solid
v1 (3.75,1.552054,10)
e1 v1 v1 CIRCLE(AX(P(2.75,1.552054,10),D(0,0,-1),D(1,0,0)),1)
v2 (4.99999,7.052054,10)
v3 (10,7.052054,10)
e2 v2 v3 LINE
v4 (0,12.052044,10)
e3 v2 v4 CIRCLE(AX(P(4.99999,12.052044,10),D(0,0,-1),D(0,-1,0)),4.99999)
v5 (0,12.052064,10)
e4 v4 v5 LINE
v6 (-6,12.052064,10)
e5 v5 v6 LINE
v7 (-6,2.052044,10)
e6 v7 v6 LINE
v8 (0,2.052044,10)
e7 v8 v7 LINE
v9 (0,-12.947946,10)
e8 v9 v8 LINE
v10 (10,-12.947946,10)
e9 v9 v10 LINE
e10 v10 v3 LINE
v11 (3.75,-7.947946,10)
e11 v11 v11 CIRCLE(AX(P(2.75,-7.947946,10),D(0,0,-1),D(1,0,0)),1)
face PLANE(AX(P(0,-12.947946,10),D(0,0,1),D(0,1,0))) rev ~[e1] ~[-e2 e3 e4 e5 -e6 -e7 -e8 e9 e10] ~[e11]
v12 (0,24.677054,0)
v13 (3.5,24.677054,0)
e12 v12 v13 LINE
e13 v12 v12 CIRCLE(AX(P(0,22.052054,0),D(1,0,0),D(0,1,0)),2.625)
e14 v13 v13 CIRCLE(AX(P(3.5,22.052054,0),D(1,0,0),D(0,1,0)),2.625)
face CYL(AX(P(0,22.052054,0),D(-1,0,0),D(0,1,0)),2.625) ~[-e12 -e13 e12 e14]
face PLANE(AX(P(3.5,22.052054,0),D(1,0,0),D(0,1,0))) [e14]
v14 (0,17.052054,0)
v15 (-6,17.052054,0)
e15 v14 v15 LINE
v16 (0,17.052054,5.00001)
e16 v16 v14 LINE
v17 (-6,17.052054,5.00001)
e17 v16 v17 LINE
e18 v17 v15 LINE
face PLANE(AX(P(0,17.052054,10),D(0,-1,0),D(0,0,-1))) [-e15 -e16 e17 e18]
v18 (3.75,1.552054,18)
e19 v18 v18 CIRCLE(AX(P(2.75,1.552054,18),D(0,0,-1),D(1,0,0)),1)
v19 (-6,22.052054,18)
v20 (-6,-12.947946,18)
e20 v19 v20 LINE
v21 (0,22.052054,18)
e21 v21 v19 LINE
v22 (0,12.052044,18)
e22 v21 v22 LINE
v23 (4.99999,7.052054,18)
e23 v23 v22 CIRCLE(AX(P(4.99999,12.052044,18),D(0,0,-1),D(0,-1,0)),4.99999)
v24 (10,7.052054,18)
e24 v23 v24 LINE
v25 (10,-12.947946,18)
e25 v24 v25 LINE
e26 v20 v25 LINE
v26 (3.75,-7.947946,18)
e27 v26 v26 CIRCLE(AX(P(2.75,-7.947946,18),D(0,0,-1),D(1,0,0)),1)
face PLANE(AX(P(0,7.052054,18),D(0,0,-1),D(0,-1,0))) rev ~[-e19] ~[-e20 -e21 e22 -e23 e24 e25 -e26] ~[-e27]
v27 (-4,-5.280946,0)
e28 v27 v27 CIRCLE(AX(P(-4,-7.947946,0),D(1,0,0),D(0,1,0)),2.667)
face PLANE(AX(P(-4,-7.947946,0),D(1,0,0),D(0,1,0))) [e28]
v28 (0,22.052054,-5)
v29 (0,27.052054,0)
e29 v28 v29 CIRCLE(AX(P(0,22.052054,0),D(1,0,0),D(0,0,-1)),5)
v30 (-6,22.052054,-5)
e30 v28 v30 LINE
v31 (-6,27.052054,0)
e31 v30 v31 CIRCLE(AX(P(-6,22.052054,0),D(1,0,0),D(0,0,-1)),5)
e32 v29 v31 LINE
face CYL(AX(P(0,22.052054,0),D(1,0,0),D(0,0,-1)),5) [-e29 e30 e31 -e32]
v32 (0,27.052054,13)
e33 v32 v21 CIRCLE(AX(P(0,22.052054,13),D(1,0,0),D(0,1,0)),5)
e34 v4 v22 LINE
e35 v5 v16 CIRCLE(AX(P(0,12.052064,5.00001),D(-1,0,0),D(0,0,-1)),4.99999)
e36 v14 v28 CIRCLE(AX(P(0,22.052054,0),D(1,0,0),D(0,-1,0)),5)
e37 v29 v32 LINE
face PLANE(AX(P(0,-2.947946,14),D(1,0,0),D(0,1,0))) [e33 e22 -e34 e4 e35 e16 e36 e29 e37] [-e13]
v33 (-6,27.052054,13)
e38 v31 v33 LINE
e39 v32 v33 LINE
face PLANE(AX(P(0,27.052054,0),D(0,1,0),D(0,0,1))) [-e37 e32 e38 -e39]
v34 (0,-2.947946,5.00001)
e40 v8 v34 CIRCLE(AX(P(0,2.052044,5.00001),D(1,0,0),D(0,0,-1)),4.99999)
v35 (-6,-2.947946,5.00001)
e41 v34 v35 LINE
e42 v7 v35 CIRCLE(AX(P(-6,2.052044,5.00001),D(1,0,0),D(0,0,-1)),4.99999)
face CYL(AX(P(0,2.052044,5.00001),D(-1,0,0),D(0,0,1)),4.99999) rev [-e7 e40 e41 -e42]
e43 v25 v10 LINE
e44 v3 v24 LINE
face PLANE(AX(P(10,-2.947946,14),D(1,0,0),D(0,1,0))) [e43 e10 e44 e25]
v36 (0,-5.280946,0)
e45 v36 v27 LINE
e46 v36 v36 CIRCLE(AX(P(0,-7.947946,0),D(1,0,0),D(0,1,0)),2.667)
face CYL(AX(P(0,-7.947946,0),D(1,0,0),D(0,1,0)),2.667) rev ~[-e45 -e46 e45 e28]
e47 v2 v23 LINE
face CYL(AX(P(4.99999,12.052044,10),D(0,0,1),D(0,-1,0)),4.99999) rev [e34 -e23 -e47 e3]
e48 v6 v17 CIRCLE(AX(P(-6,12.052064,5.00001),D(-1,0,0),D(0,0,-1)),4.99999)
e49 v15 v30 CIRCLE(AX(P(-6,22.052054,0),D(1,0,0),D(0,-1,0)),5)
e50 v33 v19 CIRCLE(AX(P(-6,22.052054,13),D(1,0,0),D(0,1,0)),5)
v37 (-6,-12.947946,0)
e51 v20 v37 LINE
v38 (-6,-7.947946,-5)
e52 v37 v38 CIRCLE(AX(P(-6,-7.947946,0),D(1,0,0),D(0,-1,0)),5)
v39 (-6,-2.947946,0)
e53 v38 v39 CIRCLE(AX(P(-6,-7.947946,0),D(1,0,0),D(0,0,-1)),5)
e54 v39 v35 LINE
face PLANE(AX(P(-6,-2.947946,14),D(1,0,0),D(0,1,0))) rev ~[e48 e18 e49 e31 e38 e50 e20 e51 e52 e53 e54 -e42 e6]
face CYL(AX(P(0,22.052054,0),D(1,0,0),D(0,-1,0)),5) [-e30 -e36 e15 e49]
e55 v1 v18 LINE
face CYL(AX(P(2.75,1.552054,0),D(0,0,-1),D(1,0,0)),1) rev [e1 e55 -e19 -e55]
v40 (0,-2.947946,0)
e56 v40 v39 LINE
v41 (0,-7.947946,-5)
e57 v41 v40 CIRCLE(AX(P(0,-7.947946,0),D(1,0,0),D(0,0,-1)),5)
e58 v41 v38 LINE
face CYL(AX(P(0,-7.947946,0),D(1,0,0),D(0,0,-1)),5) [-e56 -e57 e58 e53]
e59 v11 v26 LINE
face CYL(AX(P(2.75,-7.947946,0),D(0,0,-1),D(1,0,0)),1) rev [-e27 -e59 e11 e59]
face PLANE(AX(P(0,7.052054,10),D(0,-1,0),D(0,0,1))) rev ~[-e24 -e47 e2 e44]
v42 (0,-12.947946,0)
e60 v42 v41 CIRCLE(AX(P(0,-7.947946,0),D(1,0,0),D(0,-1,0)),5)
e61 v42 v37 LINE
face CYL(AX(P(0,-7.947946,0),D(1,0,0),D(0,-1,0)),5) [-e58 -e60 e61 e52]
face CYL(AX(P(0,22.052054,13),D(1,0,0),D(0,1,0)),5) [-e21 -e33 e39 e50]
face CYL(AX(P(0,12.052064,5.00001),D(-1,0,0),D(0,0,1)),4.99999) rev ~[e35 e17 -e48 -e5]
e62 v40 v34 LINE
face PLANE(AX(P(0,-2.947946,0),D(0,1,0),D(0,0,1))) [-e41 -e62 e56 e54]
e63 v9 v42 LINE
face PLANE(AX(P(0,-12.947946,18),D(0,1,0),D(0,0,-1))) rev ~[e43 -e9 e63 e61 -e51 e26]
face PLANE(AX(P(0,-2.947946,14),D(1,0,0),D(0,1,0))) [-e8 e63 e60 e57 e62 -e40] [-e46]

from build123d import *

# Parameters (mm, degrees)
F0_R     = 2.667
F0_R_2   = 2.625
F2_DEPTH = 6
F3_DEPTH = 3.5
F4_DEPTH = 4
F5_DEPTH = 10
F1_R     = 1
F6_DEPTH = 18.001
F7_R     = 4.99999


# Not quite as in the source:
# - a fillet or chamfer is up to 0.001 mm smaller than in the source, because OpenCascade refuses the exact size


with BuildPart() as f2:
    # F0 (on Right) → F2 (new body)
    with BuildSketch(Plane.YZ):
        Polygon((7.0520542562, 18), (-12.9479457438, 18), (-12.9479457438, 10), (-2.9479457438, 10), (7.0520542562, 10), align=None)
        with BuildLine():
            Line((22.0520542562, 18), (7.0520542562, 18))
            Line((7.0520542562, 18), (7.0520542562, 10))
            Line((7.0520542562, 10), (17.0520542562, 10))
            Line((17.0520542562, 10), (27.0520542562, 10))
            Line((27.0520542562, 10), (27.0520542562, 13))
            ThreePointArc((27.0520542562, 13), (25.5875881621, 16.5355339059), (22.0520542562, 18))
        make_face()
        with BuildLine():
            Line((-2.9479457438, 10), (-12.9479457438, 10))
            Line((-12.9479457438, 10), (-12.9479457438, 0))
            ThreePointArc((-12.9479457438, 0), (-11.4834796497, -3.5355339059), (-7.9479457438, -5))
            ThreePointArc((-7.9479457438, -5), (-4.4124118379, -3.5355339059), (-2.9479457438, 0))
            Line((-2.9479457438, 0), (-2.9479457438, 10))
        make_face()
        with Locations((-7.9479457438, 0)):
            Circle(F0_R, mode=Mode.SUBTRACT)
        with BuildLine():
            Line((27.0520542562, 10), (17.0520542562, 10))
            Line((17.0520542562, 10), (17.0520542562, 0))
            ThreePointArc((17.0520542562, 0), (18.5165203503, -3.5355339059), (22.0520542562, -5))
            ThreePointArc((22.0520542562, -5), (25.5875881621, -3.5355339059), (27.0520542562, 0))
            Line((27.0520542562, 0), (27.0520542562, 10))
        make_face()
        with Locations((22.0520542562, 0)):
            Circle(F0_R_2, mode=Mode.SUBTRACT)
        with Locations((-7.9479457438, 0)):
            Circle(F0_R)
        with Locations((22.0520542562, 0)):
            Circle(F0_R_2)
    extrude(amount=-F2_DEPTH)

    # F0 (on Right) → F3 (join)
    with BuildSketch(Plane.YZ):
        with Locations((22.0520542562, 0)):
            Circle(F0_R_2)
    extrude(amount=F3_DEPTH)

    # F0 (on Right) → F4 (cut)
    with BuildSketch(Plane.YZ):
        with Locations((-7.9479457438, 0)):
            Circle(F0_R)
    extrude(amount=-F4_DEPTH, mode=Mode.SUBTRACT)

    # F0 (on Right) → F5 (join)
    with BuildSketch(Plane.YZ):
        Polygon((7.0520542562, 18), (-12.9479457438, 18), (-12.9479457438, 10), (-2.9479457438, 10), (7.0520542562, 10), align=None)
    extrude(amount=F5_DEPTH)

    # F1 (on Top) → F6 (cut, through all)
    with BuildSketch(Plane.XY):
        with Locations((2.75, 1.5520542562)):
            Circle(F1_R)
        with Locations((2.75, -7.9479457438)):
            Circle(F1_R)
    extrude(amount=F6_DEPTH, mode=Mode.SUBTRACT)

    # F7 (radius 5 in the source; OpenCascade refuses exactly that, so slightly less here)
    f7_edges = [f2.edges().sort_by_distance(p)[0] for p in [
        (0, 7.052054, 14),
        (-3, -2.947946, 10),
        (-3, 17.052054, 10),
    ]]
    fillet(f7_edges, radius=F7_R)


solid = f2.part
